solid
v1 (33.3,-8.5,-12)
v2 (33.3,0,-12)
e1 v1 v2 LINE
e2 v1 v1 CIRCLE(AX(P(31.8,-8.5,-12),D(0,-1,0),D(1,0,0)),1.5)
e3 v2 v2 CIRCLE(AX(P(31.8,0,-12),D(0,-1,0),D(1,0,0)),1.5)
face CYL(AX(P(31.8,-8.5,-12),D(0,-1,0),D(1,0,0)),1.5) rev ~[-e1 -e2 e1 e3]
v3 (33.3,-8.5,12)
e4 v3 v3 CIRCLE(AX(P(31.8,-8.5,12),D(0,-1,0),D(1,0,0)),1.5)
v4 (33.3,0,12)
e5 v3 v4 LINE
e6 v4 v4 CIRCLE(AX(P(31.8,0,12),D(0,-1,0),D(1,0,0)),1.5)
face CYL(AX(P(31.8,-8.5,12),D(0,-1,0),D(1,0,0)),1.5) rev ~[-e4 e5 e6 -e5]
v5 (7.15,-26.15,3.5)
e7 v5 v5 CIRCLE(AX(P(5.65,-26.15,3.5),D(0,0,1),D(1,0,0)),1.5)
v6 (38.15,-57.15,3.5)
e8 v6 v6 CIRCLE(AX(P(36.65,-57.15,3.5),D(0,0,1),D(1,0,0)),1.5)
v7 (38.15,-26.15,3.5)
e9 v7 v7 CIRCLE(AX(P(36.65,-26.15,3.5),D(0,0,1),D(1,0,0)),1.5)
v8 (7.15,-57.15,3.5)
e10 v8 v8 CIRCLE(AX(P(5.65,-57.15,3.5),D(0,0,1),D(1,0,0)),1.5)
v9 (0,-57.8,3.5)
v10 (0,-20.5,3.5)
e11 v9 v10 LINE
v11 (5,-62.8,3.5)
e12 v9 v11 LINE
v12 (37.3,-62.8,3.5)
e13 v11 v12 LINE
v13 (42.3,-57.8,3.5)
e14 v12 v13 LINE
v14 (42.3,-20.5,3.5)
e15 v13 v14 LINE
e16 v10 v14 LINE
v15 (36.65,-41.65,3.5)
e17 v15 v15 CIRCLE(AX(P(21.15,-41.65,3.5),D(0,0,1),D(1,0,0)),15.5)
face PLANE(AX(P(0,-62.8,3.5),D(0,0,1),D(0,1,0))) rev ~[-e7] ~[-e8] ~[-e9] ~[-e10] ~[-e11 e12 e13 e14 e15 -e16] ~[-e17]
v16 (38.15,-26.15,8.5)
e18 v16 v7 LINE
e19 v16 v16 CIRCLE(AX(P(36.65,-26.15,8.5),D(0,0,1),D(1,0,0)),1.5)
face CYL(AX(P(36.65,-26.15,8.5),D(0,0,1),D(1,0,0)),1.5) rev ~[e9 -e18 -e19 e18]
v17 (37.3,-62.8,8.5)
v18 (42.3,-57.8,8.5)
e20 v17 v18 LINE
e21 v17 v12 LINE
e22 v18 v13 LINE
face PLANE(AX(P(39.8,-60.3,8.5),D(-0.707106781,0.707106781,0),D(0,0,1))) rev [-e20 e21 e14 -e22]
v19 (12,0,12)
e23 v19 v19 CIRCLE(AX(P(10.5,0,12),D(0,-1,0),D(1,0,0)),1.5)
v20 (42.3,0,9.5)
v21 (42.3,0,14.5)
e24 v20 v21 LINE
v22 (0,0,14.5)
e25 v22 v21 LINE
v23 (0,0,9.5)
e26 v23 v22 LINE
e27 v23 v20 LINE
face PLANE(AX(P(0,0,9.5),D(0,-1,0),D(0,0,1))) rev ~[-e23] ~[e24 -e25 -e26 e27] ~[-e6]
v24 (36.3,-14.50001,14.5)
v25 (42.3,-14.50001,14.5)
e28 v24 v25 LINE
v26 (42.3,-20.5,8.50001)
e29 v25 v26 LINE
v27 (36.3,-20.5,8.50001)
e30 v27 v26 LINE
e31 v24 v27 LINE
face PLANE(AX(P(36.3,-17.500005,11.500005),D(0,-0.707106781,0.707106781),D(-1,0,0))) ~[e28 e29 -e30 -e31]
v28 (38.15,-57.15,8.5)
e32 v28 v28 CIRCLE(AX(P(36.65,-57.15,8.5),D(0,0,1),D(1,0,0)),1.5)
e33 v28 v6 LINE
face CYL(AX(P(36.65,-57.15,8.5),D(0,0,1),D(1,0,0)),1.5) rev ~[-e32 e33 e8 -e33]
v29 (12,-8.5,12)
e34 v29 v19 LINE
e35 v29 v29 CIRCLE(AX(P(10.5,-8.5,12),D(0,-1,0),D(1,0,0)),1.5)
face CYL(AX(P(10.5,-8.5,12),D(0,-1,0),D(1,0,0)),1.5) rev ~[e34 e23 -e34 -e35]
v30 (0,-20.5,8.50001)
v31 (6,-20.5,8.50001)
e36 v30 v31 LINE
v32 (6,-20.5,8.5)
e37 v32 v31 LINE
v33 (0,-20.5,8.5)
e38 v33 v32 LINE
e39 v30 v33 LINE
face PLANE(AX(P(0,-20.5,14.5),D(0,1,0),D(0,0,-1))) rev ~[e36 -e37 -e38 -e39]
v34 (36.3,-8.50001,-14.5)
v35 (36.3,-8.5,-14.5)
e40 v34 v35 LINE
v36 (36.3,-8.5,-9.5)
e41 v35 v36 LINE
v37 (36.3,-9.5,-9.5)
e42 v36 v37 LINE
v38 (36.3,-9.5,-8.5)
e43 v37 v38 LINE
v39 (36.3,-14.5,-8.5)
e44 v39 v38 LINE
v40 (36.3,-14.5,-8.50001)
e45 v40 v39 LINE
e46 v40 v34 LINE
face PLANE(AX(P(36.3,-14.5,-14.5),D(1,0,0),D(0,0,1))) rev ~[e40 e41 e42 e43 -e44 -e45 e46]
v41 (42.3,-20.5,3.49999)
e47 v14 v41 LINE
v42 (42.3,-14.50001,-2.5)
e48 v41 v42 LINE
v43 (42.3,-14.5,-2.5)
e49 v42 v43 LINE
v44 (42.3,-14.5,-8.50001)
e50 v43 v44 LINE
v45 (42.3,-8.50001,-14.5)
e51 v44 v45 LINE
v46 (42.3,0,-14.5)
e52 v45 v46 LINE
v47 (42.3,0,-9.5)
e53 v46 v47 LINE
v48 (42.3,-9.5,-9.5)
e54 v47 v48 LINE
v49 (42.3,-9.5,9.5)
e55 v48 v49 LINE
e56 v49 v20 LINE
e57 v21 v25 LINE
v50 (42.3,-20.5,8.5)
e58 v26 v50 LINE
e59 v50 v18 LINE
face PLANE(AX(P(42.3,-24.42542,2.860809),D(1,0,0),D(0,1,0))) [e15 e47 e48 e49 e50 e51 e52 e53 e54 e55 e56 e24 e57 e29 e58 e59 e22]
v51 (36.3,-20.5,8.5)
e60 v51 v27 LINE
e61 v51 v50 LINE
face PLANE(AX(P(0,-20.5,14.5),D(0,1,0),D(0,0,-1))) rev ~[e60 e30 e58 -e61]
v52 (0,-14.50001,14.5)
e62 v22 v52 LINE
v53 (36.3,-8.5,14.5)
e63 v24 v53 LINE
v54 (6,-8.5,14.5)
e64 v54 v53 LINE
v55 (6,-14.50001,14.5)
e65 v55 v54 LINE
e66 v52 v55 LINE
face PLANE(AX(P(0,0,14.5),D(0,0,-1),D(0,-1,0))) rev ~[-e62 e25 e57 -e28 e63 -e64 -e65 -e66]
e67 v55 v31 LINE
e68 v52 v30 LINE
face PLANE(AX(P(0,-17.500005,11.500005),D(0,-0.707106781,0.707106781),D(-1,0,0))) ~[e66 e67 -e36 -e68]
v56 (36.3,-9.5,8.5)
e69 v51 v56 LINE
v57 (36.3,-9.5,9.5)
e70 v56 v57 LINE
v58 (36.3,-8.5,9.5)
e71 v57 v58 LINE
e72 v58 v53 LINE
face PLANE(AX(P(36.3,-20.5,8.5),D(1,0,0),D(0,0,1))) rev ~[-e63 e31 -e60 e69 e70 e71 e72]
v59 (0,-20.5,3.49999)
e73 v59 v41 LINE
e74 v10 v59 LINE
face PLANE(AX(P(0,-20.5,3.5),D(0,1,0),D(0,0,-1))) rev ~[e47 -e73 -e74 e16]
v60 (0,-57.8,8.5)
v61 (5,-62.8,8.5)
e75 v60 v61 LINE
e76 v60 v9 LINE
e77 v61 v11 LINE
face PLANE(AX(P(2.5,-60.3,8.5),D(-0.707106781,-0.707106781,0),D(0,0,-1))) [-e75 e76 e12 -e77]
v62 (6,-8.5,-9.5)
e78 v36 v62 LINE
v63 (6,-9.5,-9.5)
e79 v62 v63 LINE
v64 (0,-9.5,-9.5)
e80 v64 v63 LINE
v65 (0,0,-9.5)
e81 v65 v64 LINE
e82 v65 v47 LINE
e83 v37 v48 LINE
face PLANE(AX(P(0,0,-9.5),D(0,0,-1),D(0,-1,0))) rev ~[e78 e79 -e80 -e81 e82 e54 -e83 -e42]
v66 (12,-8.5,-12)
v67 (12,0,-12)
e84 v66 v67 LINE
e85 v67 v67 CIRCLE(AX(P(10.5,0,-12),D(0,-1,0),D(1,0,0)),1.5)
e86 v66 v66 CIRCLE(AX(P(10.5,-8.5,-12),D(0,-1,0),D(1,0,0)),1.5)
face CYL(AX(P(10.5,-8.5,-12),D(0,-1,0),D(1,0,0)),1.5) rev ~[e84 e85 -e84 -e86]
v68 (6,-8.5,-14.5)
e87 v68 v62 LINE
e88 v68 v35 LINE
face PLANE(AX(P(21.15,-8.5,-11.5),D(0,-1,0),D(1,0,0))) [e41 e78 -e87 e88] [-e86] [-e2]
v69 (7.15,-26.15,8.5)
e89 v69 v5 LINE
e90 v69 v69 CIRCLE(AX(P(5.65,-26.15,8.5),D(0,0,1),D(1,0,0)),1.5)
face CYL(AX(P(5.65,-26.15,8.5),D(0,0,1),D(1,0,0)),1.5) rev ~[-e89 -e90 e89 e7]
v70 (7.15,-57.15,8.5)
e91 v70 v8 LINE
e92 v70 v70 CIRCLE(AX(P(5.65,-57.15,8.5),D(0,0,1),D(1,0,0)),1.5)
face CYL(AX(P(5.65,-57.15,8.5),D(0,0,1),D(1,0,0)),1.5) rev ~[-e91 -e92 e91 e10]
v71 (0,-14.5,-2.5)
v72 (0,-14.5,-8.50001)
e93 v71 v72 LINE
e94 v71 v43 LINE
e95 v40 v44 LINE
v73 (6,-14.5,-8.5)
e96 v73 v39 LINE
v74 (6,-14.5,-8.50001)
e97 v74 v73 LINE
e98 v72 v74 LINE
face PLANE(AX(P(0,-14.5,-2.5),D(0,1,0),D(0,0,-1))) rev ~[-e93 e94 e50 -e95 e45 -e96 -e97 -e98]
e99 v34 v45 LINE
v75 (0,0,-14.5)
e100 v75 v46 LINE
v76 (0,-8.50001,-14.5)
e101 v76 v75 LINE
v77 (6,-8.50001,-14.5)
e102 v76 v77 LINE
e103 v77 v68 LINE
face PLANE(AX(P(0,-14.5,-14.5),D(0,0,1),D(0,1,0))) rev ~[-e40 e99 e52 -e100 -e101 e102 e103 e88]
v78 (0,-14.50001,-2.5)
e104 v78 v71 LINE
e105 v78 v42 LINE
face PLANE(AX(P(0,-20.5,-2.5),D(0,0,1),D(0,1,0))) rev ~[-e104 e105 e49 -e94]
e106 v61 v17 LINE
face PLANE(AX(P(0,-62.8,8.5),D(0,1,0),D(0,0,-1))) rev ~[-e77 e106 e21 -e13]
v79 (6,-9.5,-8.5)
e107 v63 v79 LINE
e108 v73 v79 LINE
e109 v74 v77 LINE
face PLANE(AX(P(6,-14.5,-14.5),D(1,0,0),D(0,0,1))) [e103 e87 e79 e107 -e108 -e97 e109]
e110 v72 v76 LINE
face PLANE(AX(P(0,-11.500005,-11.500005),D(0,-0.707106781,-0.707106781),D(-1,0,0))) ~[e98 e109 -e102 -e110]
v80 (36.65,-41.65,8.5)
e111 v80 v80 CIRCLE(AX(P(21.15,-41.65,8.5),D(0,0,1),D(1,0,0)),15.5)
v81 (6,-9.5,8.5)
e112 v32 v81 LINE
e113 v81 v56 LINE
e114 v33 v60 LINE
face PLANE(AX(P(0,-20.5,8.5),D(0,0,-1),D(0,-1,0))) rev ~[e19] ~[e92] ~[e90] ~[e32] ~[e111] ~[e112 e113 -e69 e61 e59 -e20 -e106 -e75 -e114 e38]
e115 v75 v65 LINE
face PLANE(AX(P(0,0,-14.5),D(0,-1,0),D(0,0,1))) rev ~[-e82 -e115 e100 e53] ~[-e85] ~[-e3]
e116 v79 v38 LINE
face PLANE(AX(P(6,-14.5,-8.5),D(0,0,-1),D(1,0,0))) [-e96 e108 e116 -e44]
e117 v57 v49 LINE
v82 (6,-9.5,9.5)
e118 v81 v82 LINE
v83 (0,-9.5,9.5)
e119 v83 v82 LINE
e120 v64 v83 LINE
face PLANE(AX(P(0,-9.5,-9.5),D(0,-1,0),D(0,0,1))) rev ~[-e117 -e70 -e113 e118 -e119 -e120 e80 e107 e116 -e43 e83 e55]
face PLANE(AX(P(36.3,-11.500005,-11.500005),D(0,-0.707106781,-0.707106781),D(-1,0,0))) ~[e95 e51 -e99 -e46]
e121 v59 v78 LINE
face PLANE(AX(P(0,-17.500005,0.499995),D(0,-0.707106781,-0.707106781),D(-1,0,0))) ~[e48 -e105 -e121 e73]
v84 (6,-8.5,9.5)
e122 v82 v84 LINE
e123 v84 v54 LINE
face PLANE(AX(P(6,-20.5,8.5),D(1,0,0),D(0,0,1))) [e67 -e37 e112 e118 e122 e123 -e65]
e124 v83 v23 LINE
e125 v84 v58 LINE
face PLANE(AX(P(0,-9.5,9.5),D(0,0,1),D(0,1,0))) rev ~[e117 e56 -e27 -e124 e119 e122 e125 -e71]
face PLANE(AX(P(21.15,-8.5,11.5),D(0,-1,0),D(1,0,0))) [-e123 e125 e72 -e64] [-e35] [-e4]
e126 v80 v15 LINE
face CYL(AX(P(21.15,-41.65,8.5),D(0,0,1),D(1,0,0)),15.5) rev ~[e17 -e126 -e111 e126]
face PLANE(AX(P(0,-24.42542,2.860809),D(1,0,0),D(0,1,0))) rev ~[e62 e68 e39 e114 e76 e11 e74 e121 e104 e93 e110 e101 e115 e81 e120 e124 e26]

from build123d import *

# Parameters (mm, degrees)
F1_DEPTH  = 42.3
F3_W      = 30.3
F3_H      = 6
F4_DEPTH  = 6
F2_W      = 30.3
F2_H      = 6
F5_DEPTH  = 12
F6_SIZE   = 5.99999
F7_R      = 1.5
F8_DEPTH  = 8.501
F9_R      = 1.5
F10_DEPTH = 8.501
F11_R     = 1.5
F11_R_2   = 15.5
F12_DEPTH = 5
F13_SIZE  = 5


# Not quite as in the source:
# - a fillet or chamfer is up to 0.001 mm smaller than in the source, because OpenCascade refuses the exact size
# - a feature names something its author has since deleted; it is built from what else it names


with BuildPart() as f1:
    # F0 (on Right) → F1 (new body)
    with BuildSketch(Plane.YZ):
        Polygon((-9.5, 9.5), (0, 9.5), (0, 14.5), (-14.5, 14.5), (-20.5, 14.5), (-20.5, 8.5), (-62.8, 8.5), (-62.8, 3.5), (-20.5, 3.5), (-20.5, -2.5), (-14.5, -2.5), (-14.5, -14.5), (0, -14.5), (0, -9.5), (-9.5, -9.5), align=None)
    extrude(amount=F1_DEPTH)

    # F3 (on face) → F4 (cut)
    with BuildSketch(Plane.XZ.offset(14.5)):
        with Locations((21.15, -11.5)):
            Rectangle(F3_W, F3_H)
    extrude(amount=-F4_DEPTH, mode=Mode.SUBTRACT)

    # F2 (on face) → F5 (cut)
    with BuildSketch(Plane.XZ.offset(20.5)):
        with Locations((21.15, 11.5)):
            Rectangle(F2_W, F2_H)
    extrude(amount=-F5_DEPTH, mode=Mode.SUBTRACT)

    # F6 (size 6 in the source; OpenCascade refuses exactly that, so slightly less here)
    f6_edges = [f1.edges().sort_by_distance(p)[0] for p in [
        (3, -14.5, -14.5),
        (39.3, -14.5, -14.5),
        (3, -20.5, 14.5),
        (39.3, -20.5, 14.5),
        (21.15, -20.5, -2.5),
    ]]
    chamfer(f6_edges, length=F6_SIZE)

    # F7 (on face) → F8 (cut, through all)
    with BuildSketch(Plane.XZ.offset(8.5)):
        with Locations((10.5, 12)):
            Circle(F7_R)
        with Locations((31.8, 12)):
            Circle(F7_R)
    extrude(amount=-F8_DEPTH, mode=Mode.SUBTRACT)

    # F9 (on face) → F10 (cut, through all)
    with BuildSketch(Plane.XZ.offset(8.5)):
        with Locations((10.5, -12)):
            Circle(F9_R)
        with Locations((31.8, -12)):
            Circle(F9_R)
    extrude(amount=-F10_DEPTH, mode=Mode.SUBTRACT)

    # F11 (on face) → F12 (cut, through all)
    with BuildSketch(Plane.XY.offset(8.5)):
        with Locations((5.65, -57.15)):
            Circle(F11_R)
        with Locations((5.65, -26.15)):
            Circle(F11_R)
        with Locations((36.65, -26.15)):
            Circle(F11_R)
        with Locations((36.65, -57.15)):
            Circle(F11_R)
        with Locations((21.15, -41.65)):
            Circle(F11_R_2)
    extrude(amount=-F12_DEPTH, mode=Mode.SUBTRACT)

    # F13
    f13_edges = [f1.edges().sort_by_distance(p)[0] for p in [
        (42.3, -62.8, 6),
        (0, -62.8, 6),
    ]]
    chamfer(f13_edges, length=F13_SIZE)


solid = f1.part
